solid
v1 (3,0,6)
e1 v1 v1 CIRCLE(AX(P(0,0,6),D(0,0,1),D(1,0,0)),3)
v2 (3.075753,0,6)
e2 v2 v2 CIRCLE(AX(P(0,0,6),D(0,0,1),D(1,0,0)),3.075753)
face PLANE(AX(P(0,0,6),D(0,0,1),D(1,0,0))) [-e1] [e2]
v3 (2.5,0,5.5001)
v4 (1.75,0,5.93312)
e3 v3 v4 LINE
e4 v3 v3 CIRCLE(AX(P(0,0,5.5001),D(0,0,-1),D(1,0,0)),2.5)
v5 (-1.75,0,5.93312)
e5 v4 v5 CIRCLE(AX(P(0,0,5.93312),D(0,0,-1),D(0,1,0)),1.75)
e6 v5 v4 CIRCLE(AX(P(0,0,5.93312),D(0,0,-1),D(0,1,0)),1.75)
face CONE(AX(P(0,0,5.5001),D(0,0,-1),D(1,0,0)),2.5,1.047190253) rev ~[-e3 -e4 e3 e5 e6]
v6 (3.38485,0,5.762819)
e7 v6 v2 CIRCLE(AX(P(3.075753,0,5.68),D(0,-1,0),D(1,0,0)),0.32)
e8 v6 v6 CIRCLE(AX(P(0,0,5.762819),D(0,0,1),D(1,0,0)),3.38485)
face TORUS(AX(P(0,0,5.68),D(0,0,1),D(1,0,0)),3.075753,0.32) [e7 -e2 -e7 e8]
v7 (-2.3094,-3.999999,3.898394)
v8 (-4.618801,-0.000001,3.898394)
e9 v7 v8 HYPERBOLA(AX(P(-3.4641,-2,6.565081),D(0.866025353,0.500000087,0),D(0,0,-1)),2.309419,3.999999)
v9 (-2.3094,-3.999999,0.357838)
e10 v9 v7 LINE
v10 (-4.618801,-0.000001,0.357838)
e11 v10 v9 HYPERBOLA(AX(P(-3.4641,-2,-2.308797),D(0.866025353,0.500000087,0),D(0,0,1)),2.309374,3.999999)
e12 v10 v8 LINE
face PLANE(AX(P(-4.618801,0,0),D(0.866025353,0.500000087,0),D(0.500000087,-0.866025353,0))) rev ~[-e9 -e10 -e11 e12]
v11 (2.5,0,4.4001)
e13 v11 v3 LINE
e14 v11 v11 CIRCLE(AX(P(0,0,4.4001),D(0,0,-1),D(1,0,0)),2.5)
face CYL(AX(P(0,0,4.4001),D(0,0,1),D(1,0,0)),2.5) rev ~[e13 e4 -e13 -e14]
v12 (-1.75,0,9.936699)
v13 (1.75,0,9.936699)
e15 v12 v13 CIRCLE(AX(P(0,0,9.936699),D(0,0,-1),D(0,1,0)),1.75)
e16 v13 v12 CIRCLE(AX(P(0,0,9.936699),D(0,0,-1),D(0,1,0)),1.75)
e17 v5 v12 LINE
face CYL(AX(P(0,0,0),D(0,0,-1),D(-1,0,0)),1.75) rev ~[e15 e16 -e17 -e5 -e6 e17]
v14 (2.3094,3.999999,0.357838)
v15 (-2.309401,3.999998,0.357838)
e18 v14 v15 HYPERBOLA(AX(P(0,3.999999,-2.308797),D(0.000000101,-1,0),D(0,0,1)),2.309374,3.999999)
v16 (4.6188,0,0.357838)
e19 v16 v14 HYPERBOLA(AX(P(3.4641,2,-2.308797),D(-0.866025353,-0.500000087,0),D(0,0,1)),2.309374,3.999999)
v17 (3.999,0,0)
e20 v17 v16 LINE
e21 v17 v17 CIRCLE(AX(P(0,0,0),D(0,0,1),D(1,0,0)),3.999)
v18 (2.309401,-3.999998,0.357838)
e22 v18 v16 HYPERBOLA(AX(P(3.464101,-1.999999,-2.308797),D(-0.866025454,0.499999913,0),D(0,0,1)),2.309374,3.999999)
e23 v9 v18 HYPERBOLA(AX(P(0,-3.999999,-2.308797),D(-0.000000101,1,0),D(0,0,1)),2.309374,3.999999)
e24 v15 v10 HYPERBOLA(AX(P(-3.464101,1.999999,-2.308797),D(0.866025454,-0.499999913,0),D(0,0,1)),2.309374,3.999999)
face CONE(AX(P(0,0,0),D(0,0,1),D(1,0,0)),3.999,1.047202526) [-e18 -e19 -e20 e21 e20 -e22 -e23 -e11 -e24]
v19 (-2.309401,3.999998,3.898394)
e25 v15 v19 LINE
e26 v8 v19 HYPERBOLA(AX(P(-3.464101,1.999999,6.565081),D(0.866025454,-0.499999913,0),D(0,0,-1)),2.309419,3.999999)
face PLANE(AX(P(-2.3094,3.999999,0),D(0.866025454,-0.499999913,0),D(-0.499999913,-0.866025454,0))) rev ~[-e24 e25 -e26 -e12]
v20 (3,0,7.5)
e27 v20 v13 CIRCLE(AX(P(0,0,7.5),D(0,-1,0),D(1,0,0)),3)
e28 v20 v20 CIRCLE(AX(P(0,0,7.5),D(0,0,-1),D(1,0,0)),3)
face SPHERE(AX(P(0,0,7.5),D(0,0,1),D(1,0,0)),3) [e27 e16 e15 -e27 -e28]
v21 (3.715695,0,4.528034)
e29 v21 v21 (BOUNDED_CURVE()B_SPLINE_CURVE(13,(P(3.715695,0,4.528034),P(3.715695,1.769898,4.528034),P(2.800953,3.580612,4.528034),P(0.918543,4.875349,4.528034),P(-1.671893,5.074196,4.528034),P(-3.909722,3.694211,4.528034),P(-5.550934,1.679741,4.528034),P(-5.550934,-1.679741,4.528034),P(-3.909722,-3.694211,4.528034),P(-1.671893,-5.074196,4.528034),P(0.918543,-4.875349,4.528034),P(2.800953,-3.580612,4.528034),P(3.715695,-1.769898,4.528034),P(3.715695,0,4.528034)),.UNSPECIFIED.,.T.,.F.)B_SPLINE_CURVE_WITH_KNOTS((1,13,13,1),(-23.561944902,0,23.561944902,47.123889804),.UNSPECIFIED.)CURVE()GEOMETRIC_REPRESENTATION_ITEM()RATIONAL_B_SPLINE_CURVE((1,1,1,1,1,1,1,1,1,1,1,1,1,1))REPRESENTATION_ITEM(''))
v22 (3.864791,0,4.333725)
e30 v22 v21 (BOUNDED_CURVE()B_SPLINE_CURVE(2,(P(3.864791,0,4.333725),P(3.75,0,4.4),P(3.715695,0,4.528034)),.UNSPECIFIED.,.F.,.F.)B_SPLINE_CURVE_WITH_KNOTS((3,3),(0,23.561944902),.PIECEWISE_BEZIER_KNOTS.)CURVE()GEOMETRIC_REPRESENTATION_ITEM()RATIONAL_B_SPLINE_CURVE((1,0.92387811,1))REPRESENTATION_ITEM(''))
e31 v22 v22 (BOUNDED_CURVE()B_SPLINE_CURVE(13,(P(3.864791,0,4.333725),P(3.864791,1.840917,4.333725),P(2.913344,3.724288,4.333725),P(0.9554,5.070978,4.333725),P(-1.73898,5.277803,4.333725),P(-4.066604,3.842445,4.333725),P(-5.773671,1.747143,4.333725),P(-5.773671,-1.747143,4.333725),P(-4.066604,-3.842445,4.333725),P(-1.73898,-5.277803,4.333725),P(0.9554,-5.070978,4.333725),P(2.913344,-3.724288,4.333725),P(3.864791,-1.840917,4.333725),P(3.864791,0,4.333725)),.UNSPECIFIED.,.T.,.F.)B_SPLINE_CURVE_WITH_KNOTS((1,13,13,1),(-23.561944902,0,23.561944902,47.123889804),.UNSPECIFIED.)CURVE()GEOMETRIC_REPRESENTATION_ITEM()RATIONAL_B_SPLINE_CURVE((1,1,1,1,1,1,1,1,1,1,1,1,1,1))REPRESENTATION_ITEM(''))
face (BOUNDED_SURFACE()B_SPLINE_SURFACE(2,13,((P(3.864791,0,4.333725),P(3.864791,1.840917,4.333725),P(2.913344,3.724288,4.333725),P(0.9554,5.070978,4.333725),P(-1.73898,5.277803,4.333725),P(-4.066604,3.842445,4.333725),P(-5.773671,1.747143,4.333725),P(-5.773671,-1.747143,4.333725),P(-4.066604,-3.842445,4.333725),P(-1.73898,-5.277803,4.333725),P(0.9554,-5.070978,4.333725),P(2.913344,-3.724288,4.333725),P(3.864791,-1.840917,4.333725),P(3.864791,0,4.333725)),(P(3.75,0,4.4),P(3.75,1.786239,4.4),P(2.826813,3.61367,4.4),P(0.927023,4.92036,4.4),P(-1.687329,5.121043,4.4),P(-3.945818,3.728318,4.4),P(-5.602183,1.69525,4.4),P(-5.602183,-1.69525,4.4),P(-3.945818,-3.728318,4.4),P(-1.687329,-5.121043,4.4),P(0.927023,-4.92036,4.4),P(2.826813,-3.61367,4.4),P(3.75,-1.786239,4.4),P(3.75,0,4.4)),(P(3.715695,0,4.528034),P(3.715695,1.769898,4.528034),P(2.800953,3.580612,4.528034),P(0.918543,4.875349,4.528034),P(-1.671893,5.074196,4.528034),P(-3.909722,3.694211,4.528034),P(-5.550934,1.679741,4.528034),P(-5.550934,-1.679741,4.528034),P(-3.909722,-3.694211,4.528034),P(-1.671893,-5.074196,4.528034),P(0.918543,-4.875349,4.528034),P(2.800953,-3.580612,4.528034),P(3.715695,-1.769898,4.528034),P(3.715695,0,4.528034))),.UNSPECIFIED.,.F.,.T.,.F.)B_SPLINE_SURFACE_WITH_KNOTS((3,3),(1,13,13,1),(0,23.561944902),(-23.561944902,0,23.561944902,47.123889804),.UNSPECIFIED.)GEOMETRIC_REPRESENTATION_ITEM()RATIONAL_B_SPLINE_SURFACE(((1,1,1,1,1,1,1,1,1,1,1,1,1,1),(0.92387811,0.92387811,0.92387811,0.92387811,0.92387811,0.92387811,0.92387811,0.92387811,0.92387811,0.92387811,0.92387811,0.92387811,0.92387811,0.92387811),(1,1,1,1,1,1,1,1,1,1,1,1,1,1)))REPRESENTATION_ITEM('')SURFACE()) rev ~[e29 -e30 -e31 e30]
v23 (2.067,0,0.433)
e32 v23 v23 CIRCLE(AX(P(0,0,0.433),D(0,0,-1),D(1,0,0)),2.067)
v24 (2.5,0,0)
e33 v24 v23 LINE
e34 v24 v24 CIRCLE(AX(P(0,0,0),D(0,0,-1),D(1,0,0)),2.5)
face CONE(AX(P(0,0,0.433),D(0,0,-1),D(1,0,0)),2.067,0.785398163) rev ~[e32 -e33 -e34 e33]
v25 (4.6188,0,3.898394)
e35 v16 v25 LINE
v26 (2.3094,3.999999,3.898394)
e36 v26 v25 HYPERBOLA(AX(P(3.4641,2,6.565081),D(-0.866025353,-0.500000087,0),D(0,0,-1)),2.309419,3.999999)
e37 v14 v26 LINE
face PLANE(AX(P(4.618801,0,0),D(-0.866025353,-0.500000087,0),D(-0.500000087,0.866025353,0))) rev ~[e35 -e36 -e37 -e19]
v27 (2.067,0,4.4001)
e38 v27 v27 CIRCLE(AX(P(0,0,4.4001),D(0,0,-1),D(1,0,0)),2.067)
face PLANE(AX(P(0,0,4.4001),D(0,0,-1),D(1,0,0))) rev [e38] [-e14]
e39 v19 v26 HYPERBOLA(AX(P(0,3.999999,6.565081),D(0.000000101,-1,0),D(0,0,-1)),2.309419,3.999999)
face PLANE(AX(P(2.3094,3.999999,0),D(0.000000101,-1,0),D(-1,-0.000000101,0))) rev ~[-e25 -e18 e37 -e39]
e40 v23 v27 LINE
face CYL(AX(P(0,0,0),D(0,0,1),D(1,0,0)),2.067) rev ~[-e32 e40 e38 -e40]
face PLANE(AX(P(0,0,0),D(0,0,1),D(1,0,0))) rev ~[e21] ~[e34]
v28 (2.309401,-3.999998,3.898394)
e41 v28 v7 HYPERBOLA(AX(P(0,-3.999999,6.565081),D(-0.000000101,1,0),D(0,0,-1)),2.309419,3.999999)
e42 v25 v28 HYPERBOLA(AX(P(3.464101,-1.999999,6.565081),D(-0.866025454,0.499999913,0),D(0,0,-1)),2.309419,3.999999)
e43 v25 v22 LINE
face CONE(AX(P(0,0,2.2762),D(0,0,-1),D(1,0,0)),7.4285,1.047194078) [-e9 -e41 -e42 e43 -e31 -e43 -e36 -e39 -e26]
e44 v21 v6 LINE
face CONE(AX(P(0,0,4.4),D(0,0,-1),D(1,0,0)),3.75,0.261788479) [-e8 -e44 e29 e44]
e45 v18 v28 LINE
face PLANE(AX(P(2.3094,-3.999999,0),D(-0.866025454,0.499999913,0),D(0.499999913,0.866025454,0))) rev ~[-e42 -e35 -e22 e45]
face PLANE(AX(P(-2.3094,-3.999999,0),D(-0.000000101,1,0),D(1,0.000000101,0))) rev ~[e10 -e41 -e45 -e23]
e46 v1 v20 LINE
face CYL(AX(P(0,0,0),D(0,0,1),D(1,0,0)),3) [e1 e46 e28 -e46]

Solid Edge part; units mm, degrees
sketch "Sketch1" plane through (0, 0, 0) normal (0, 0, 1) x (1, 0, 0)
  circle A0 centre (0, 0) radius 4.6188
  dimension "D1" = 4
extrude "Protrusion1" add sketch "Sketch1" along normal blind 6
sketch "Sketch2" plane through (0, 0, 0) normal (0, 0, 1) x (1, 0, 0)
  arc A0 (2.3094, 4) -> (4.6188, 0) centre (0, 0) cw
  line L0 (4.6188, 0) -> (2.3094, 4)
  dimension "D1" = 4
extrude "ExtrudedCutout_1" cut sketch "Sketch2" along normal blind 6
pattern_circular "Pattern1" count 6 over 360 about axis through (0, 0, 0) along (0, 0, 1) of "ExtrudedCutout_1"
sketch "Sketch3" plane through (0, 0, 0) normal (0, -1, 0) x (1, 0, 0)
  line L0 (0, 0) -> (3, 0)
  line L1 (3, 0) -> (3, 7.5)
  arc A0 (3, 7.5) -> (0, 10.5) centre (0, 7.5) ccw
  dimension "D1" = 10.5
  dimension "D2" = 3
revolve "RevolvedProtrusion_1" add sketch "Sketch3" angle 360 about axis through (0, 0, 18.1) along (0, 0, -1)
sketch "Sketch4" plane through (0, 0, 0) normal (0, -1, 0) x (1, 0, 0)
  line L0 (0, 0) -> (2.067, 0)
  line L1 (2.067, 0) -> (2.067, 4.4001)
  line L2 (2.067, 4.4001) -> (2.5, 4.4001)
  line L3 (2.5, 4.4001) -> (2.5, 5.5001)
  line L4 (2.5, 5.5001) -> (0, 6.9435)
  dimension "D1" = 2.067
  dimension "D2" = 2.5
  dimension "D3" = 4.4001
  dimension "D4" = 1.1
revolve "RevolvedCutout_1" cut sketch "Sketch4" angle 360 about axis through (0, 0, 12.9269) along (0, 0, -1)
sketch "Sketch5" plane through (0, 0, 0) normal (0, -1, 0) x (1, 0, 0)
  line L0 (3.3213, 6) -> (7.4285, 6)
  line L1 (7.4285, 6) -> (7.4285, 2.2762)
  line L2 (7.4285, 2.2762) -> (3.75, 4.4)
  line L3 (3.75, 4.4) -> (3.3213, 6)
  line L4 (3.999, 0) -> (7.4285, 1.98)
  line L5 (7.4285, 1.98) -> (7.4285, 0)
  line L6 (7.4285, 0) -> (3.999, 0)
  dimension "D1" = 3.999
  dimension "D2" = 1.98
  dimension "D3" = 3.75
  dimension "D4" = 4.4
  dimension "D5" = 1.6
revolve "RevolvedCutout_2" cut sketch "Sketch5" angle 360 about axis through (0, 0, 0) along (0, 0, 1)
fillet "Round_1" radius 0.32 2 edges at (-3.3213, 0, 6) (-3.75, 0, 4.4)
cosmetic_thread "Thread_1" size "M5" thread depth 4.4
chamfer "Chamfer_1" distance 0.433 angle 45 1 edges at (-2.067, 0, 0)
sketch "Sketch6" plane through (0, 0, 0) normal (0, 0, -1) x (-1, 0, 0)
  circle A0 centre (0, 0) radius 1.75
  dimension "D1" = 3.5
extrude "Cutout6" cut sketch "Sketch6" against normal through all
properties part number "NK108" material "Stahl"
